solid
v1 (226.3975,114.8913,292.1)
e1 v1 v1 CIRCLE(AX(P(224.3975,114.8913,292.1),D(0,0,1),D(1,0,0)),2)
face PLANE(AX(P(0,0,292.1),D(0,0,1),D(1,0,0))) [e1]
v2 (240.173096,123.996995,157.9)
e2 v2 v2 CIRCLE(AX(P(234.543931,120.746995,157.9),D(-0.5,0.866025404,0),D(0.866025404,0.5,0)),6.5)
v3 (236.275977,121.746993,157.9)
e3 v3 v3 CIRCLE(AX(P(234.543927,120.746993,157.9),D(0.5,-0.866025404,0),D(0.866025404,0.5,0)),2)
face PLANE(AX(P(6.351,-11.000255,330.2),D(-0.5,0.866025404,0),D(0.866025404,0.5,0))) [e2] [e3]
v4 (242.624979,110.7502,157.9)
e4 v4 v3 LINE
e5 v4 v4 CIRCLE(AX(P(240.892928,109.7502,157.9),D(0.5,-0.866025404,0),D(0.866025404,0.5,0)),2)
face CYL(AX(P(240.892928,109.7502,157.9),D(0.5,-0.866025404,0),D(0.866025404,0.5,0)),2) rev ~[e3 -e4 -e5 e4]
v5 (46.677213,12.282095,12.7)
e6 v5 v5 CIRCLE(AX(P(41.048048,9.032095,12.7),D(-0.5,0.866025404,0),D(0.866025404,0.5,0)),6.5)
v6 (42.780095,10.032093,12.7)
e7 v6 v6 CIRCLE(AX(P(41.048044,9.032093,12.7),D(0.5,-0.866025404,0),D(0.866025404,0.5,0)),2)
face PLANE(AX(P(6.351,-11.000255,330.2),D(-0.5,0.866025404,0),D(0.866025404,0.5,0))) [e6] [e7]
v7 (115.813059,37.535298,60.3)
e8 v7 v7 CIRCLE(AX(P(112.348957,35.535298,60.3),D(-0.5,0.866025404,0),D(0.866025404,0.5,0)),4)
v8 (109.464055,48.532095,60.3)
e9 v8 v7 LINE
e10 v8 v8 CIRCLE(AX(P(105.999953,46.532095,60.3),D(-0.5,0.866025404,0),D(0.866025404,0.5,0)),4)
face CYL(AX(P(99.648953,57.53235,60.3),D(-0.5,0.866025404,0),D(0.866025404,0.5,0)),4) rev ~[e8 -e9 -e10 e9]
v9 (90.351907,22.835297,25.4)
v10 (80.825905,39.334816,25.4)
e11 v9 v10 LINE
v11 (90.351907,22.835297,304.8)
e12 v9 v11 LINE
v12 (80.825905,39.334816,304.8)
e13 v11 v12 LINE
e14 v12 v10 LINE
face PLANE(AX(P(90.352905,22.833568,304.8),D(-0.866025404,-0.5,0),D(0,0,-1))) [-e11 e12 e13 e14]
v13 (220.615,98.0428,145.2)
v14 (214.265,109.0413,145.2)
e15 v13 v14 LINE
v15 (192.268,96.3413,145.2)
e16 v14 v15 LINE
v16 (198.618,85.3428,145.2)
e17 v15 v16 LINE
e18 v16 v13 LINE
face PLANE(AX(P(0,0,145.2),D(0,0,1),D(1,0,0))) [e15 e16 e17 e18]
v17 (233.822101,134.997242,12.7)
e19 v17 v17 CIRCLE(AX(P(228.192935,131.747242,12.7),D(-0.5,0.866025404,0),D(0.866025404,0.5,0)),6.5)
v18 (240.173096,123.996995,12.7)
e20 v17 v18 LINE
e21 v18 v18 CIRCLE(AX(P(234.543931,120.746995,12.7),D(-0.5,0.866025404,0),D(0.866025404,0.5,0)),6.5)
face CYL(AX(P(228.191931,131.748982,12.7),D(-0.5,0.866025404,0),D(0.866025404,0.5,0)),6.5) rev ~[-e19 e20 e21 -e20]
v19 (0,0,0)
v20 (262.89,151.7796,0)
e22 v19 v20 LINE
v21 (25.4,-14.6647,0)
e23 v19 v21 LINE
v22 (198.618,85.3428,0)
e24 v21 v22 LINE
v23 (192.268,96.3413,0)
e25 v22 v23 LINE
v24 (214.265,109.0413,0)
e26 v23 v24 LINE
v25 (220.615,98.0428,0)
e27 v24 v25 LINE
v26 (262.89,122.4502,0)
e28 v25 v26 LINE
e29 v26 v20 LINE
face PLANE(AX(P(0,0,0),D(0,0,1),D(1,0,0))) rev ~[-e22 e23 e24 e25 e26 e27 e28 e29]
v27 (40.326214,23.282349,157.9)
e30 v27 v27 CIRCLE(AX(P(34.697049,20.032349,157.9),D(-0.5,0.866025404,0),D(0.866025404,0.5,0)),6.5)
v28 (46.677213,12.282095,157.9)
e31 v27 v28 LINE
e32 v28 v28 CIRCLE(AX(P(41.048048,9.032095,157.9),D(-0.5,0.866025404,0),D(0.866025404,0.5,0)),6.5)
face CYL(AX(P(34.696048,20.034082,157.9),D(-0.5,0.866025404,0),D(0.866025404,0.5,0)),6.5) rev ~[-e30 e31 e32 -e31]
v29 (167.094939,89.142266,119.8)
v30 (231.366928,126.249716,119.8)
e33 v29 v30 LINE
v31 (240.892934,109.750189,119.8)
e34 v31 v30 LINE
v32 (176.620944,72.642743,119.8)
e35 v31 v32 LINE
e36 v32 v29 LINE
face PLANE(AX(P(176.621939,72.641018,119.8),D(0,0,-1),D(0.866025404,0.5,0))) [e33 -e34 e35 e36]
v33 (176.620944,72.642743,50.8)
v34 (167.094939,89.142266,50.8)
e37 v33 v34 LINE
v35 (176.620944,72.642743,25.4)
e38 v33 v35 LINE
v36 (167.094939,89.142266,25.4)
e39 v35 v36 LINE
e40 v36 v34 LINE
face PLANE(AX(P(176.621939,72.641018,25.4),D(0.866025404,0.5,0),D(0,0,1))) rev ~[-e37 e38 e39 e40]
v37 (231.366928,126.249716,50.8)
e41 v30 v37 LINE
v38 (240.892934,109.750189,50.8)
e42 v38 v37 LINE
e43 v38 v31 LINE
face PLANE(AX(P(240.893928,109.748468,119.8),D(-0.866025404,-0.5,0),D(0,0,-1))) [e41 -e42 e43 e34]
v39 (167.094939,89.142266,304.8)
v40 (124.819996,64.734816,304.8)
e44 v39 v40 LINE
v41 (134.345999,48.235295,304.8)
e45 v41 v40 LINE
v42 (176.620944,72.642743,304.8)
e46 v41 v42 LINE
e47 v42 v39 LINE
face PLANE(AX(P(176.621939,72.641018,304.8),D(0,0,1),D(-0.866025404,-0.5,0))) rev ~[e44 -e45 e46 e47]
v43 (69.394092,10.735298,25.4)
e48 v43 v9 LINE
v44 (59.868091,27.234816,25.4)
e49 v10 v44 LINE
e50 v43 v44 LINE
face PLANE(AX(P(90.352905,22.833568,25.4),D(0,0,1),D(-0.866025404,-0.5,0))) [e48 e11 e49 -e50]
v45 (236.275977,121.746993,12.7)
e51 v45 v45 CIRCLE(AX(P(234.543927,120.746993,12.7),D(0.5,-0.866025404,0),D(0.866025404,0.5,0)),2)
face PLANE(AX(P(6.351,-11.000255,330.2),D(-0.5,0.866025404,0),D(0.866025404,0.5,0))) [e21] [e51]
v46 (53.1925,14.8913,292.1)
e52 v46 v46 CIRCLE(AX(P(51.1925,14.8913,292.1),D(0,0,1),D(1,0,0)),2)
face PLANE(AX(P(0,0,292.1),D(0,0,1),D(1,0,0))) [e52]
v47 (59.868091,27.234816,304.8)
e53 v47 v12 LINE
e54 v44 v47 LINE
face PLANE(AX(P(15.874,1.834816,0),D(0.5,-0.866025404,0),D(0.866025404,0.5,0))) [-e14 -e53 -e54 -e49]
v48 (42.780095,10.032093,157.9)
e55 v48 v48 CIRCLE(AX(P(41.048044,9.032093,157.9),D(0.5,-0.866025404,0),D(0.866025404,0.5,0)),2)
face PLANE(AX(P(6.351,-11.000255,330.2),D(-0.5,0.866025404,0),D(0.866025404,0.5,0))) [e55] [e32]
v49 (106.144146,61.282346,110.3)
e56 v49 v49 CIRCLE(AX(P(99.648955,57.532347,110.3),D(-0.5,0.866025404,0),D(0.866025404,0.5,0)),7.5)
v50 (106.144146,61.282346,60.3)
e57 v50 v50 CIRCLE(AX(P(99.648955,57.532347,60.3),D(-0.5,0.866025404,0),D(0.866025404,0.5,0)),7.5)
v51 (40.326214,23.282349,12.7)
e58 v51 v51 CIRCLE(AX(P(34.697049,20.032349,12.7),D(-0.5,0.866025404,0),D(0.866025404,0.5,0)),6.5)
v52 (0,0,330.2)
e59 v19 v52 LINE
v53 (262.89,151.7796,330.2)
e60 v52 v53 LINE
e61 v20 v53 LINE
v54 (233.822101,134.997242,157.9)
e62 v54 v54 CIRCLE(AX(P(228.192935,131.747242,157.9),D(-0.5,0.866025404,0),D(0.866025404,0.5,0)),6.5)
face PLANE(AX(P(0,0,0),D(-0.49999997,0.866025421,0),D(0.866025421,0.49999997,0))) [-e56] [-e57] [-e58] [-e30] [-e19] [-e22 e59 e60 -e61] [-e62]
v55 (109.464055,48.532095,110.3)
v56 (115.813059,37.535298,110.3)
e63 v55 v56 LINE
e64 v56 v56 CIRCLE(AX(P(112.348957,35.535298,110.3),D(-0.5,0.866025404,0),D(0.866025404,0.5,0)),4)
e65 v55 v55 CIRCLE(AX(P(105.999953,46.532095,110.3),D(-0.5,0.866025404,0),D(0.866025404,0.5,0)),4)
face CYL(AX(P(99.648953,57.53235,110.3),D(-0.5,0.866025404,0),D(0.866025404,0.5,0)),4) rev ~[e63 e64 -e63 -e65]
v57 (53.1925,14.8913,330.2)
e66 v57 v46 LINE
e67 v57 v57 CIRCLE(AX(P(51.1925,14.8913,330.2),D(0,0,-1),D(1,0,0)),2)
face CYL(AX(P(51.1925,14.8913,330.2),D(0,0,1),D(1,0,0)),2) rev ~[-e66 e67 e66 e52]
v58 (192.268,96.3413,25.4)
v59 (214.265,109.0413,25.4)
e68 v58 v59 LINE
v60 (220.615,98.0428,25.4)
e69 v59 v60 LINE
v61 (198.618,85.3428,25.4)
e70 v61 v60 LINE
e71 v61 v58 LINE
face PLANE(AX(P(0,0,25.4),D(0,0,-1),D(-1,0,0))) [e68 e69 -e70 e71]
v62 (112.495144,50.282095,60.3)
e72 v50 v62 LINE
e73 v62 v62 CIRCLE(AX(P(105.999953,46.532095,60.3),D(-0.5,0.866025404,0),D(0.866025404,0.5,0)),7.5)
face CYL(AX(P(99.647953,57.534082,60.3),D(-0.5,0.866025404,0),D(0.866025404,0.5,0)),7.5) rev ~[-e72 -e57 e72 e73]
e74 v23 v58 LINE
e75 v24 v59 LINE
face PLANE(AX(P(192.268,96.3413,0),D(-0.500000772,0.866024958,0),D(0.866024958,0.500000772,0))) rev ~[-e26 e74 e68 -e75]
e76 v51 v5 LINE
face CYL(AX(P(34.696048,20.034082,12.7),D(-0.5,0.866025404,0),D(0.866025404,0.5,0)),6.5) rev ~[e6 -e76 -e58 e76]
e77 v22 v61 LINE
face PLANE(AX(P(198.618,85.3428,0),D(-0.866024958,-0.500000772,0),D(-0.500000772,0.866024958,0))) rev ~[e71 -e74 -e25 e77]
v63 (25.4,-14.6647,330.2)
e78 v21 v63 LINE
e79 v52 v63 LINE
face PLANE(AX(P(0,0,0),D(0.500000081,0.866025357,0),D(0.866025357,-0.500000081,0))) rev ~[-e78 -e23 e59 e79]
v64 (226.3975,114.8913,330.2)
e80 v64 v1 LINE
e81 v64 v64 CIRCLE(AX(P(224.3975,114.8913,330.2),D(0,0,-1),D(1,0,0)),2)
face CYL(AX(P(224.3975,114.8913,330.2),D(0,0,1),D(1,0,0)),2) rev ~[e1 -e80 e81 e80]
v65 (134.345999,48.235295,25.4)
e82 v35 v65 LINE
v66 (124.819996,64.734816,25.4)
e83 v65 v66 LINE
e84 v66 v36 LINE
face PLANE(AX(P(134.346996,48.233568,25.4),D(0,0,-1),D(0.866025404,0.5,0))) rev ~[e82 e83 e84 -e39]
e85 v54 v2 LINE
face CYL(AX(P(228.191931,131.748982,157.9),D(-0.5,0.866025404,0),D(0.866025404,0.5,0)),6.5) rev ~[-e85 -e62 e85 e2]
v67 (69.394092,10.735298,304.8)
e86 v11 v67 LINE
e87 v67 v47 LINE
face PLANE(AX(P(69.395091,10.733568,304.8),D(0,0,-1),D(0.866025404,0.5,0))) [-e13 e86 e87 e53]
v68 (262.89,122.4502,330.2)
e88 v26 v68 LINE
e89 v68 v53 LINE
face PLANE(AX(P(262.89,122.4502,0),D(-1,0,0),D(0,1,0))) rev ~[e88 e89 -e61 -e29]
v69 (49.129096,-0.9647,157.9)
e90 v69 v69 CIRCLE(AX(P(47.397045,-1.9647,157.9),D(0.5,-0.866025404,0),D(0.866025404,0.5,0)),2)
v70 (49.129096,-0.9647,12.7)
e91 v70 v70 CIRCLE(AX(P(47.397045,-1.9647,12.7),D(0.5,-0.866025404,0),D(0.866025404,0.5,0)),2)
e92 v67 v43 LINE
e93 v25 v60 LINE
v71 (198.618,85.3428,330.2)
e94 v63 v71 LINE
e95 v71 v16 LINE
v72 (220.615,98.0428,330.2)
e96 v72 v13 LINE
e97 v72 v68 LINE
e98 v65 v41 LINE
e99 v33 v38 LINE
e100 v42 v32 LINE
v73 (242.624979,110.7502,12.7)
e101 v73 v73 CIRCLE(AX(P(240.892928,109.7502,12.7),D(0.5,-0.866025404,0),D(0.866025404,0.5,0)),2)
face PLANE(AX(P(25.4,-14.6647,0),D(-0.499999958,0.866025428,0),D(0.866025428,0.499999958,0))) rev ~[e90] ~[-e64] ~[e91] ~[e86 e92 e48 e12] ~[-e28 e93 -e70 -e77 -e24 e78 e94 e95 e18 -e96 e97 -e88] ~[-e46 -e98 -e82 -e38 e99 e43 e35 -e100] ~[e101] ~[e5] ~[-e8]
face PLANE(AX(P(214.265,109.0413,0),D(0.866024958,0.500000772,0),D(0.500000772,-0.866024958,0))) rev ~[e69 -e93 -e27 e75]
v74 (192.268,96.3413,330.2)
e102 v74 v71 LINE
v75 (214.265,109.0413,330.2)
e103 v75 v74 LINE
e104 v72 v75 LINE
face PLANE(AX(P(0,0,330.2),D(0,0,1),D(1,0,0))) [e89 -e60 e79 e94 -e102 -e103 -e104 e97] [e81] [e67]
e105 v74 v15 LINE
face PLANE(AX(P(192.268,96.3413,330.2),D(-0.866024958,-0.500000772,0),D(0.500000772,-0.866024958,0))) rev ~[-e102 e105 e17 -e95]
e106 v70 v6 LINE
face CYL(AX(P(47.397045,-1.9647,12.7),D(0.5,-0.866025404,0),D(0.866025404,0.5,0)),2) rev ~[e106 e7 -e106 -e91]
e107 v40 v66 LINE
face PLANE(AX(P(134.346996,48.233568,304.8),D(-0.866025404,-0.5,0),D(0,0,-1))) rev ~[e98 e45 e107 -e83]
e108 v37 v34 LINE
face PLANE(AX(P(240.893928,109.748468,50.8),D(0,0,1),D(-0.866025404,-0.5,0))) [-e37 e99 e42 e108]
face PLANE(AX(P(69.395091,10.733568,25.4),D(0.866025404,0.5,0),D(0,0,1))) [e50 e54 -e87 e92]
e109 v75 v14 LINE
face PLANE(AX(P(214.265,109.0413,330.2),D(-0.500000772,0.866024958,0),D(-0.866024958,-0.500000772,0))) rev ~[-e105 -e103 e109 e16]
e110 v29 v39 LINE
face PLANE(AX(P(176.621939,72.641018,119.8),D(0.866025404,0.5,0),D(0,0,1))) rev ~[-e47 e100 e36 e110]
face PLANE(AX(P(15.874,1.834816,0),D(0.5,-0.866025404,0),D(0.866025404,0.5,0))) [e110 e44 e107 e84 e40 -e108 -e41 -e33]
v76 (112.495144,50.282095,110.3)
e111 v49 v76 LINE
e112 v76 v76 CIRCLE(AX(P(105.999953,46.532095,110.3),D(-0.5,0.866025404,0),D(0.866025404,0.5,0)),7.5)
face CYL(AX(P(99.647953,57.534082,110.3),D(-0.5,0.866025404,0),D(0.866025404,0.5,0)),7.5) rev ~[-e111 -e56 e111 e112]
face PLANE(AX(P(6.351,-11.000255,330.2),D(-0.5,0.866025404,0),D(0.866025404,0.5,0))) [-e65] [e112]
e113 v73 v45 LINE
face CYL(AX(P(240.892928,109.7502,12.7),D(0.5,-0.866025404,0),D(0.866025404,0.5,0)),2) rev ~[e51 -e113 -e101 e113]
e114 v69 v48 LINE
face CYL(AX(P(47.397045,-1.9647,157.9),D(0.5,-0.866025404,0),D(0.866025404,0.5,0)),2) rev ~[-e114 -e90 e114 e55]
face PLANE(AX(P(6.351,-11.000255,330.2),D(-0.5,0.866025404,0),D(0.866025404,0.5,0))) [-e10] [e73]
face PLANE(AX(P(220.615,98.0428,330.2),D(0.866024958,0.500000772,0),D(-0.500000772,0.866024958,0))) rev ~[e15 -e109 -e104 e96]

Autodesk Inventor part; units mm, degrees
ref_plane "YZ Plane" through (0, 0, 0) normal (1, 0, 0) x (0, 1, 0)
ref_plane "XZ Plane" through (0, 0, 0) normal (0, 1, 0) x (-1, 0, 0)
ref_plane "XY Plane" through (0, 0, 0) normal (0, 0, 1) x (1, 0, 0)
sketch "Sketch1" plane through (0, 0, 0) normal (0, 0, 1) x (1, 0, 0)
  line L0 (262.89, 151.7796) -> (525.78, 0) construction
  line L1 (525.78, 0) -> (525.78, -303.5592) construction
  line L2 (525.78, -303.5592) -> (262.89, -455.3388) construction
  line L3 (262.89, -455.3388) -> (0, -303.5592) construction
  line L4 (0, -303.5592) -> (0, 0) construction
  line L5 (0, 0) -> (262.89, 151.7796)
  line L6 (0, 0) -> (25.4, -14.6647)
  line L7 (25.4, -14.6647) -> (262.89, 122.4502)
  line L8 (262.89, 122.4502) -> (262.89, 151.7796)
  point P0 (262.89, -151.7796)
  dimension "d0" = 525.78
  dimension "d2" = 25.4
  dimension "d3" = 60
  dimension "d4" = 60
extrude "Extrusion1" add sketch "Sketch1" along normal blind 330.2
sketch "Sketch8" plane through (0, 0, 0) normal (0, 0, -1) x (-1, 0, 0)
  line L0 (-25.4, -14.6647) -> (-262.89, 122.4502) projected
  line L1 (-198.618, 85.3428) -> (-192.268, 96.3413)
  line L2 (-192.268, 96.3413) -> (-214.265, 109.0413)
  line L3 (-214.265, 109.0413) -> (-220.615, 98.0428)
  line L4 (-198.618, 85.3428) -> (-220.615, 98.0428)
  point P0 (0, 0)
  dimension "d47" = 25.4
  dimension "d48" = 12.7
  dimension "d49" = 48.8149
extrude "Extrusion7" cut sketch "Sketch8" against normal blind 25.4
sketch "Sketch9" plane through (0, 0, 330.2) normal (0, 0, 1) x (1, 0, 0)
  line L0 (192.268, 96.3413) -> (198.618, 85.3428) projected
  line L1 (214.265, 109.0413) -> (192.268, 96.3413) projected
  line L2 (220.615, 98.0428) -> (214.265, 109.0413) projected
  line L3 (198.618, 85.3428) -> (220.615, 98.0428) projected
  point P0 (0, 0)
extrude "Extrusion8" cut sketch "Sketch9" against normal blind 185
sketch "Sketch10" plane through (25.4, -14.6647, 0) normal (0.5, -0.8660254, 0) x (0.8660254, 0.5, 0)
  line L0 (25.4, 157.9) -> (248.8298, 157.9) construction
  line L1 (248.8298, 157.9) -> (248.8298, 12.7) construction
  line L2 (248.8298, 12.7) -> (25.4, 12.7) construction
  line L3 (25.4, 12.7) -> (25.4, 157.9) construction
  line L4 (225.4149, 145.2) -> (200.0149, 145.2) construction
  line L5 (200.0149, 25.4) -> (225.4149, 25.4) construction
  line L6 (274.2298, 0) -> (274.2298, 330.2) construction
  line L7 (0, 0) -> (0, 330.2) construction
  circle A0 centre (25.4, 157.9) radius 2
  circle A1 centre (25.4, 12.7) radius 2
  circle A2 centre (248.8298, 157.9) radius 2
  circle A3 centre (248.8298, 12.7) radius 2
  point P0 (-14.6647, 0)
  dimension "d54" = 12.7
  dimension "d55" = 12.7
  dimension "d56" = 25.4
  dimension "d57" = 25.4
  dimension "d58" = 4
  dimension "d59" = 4
  dimension "d60" = 4
  dimension "d61" = 4
extrude "Extrusion9" cut sketch "Sketch10" against normal through all
sketch "Sketch11" plane through (0, 0, 330.2) normal (-0.5, 0.8660254, 0) x (0.8660254, 0.5, 0)
  circle A0 centre (263.4945, 172.3) radius 2 projected
  circle A1 centre (263.4945, 317.5) radius 2 projected
  circle A2 centre (40.0647, 317.5) radius 2 projected
  circle A3 centre (40.0647, 172.3) radius 2 projected
  circle A4 centre (263.4945, 172.3) radius 6.5
  circle A5 centre (40.0647, 172.3) radius 2 projected
  circle A6 centre (40.0647, 172.3) radius 6.5
  circle A7 centre (40.0647, 317.5) radius 6.5
  circle A8 centre (263.4945, 317.5) radius 2 projected
  circle A9 centre (263.4945, 317.5) radius 6.5
  point P0 (0, 330.2)
  dimension "d64" = 13
  dimension "d65" = 13
  dimension "d66" = 13
  dimension "d67" = 13
extrude "Extrusion10" cut sketch "Sketch11" against normal blind 12.7 contours A0 | A1 | A2 | A3 | A4 | A6 | A7 | A9
sketch "Sketch12" plane through (0, 0, 330.2) normal (-0.5, 0.8660254, 0) x (0.8660254, 0.5, 0)
  circle A0 centre (115.0647, 269.9) radius 4
  circle A1 centre (115.0647, 219.9) radius 4
  circle A2 centre (40.0647, 317.5) radius 6.5 construction
  circle A3 centre (40.0647, 172.3) radius 6.5 construction
  circle A4 centre (40.0647, 317.5) radius 2 projected
  circle A5 centre (40.0647, 172.3) radius 2 projected
  line L0 (40.0647, 317.5) -> (40.0647, 172.3) construction
  line L1 (115.0647, 269.9) -> (115.0647, 219.9) construction
  point P0 (0, 330.2)
  point P1 (40.0647, 244.9)
  point P2 (115.0647, 244.9)
  dimension "d70" = 8
  dimension "d71" = 8
  dimension "d72" = 75
  dimension "d73" = 50
extrude "Extrusion11" cut sketch "Sketch12" against normal through all contours A0 | A1
sketch "Sketch13" plane through (0, 0, 330.2) normal (-0.5, 0.8660254, 0) x (0.8660254, 0.5, 0)
  circle A0 centre (115.0647, 219.9) radius 4 projected
  circle A1 centre (115.0647, 269.9) radius 4 projected
  circle A2 centre (115.0647, 219.9) radius 7.5
  circle A3 centre (115.0647, 269.9) radius 7.5
  point P0 (0, 330.2)
  dimension "d76" = 15
  dimension "d77" = 15
extrude "Extrusion12" cut sketch "Sketch13" against normal blind 12.7 contours A0 | A1 | A2 | A3
sketch "Sketch14" plane through (25.4, -14.6647, 0) normal (0.5, -0.8660254, 0) x (0.8660254, 0.5, 0)
  line L0 (50.8, 304.8) -> (75, 304.8)
  line L1 (75, 304.8) -> (75, 25.4)
  line L2 (75, 25.4) -> (50.8, 25.4)
  line L3 (50.8, 25.4) -> (50.8, 304.8)
  line L4 (125.8, 25.4) -> (174.6149, 25.4)
  line L5 (174.6149, 25.4) -> (174.6149, 304.8)
  line L6 (174.6149, 304.8) -> (125.8, 304.8)
  line L7 (125.8, 304.8) -> (125.8, 25.4)
  line L8 (174.6149, 119.8) -> (248.8298, 119.8)
  line L9 (248.8298, 119.8) -> (248.8298, 50.8)
  line L10 (248.8298, 50.8) -> (174.6149, 50.8)
  line L11 (174.6149, 50.8) -> (174.6149, 119.8)
  line L12 (0, 330.2) -> (200.0149, 330.2) projected
  line L13 (0, 0) -> (200.0149, 0) projected
  line L14 (200.0149, 0) -> (200.0149, 25.4) projected
  circle A0 centre (100.4, 110.3) radius 4 projected
  circle A1 centre (25.4, 157.9) radius 2 projected
  line L15 (225.4149, 145.2) -> (200.0149, 145.2) projected
  line L16 (200.0149, 25.4) -> (225.4149, 25.4) projected
  line L17 (274.2298, 0) -> (274.2298, 330.2) projected
  point P0 (-14.6647, 0)
  dimension "d80" = 25.4
  dimension "d81" = 25.4
  dimension "d82" = 25.4
  dimension "d83" = 25.4
  dimension "d84" = 25.4
  dimension "d85" = 25.4
  dimension "d86" = 25.4
  dimension "d87" = 25.4
  dimension "d88" = 25.4
extrude "Extrusion13" cut sketch "Sketch14" against normal blind 19.05 contours L0 L1 L2 L3 | L7 L6 L5 L4 | L5 L8 L9 L10
sketch "Sketch15" plane through (0, 0, 330.2) normal (0, 0, 1) x (1, 0, 0)
  line L0 (12.7, -7.3323) -> (262.89, 137.1149) construction
  line L1 (0, 0) -> (25.4, -14.6647) projected
  line L2 (262.89, 122.4502) -> (262.89, 151.7796) projected
  line L3 (51.1925, 14.8913) -> (224.3975, 114.8913)
  circle A0 centre (51.1925, 14.8913) radius 2
  circle A1 centre (224.3975, 114.8913) radius 2
  point P0 (137.795, 64.8913)
  dimension "d91" = 200
  dimension "d92" = 4
  dimension "d93" = 4
extrude "Extrusion14" cut sketch "Sketch15" against normal blind 38.1
properties part number "HB02" material "Polyethylene, High Density"
